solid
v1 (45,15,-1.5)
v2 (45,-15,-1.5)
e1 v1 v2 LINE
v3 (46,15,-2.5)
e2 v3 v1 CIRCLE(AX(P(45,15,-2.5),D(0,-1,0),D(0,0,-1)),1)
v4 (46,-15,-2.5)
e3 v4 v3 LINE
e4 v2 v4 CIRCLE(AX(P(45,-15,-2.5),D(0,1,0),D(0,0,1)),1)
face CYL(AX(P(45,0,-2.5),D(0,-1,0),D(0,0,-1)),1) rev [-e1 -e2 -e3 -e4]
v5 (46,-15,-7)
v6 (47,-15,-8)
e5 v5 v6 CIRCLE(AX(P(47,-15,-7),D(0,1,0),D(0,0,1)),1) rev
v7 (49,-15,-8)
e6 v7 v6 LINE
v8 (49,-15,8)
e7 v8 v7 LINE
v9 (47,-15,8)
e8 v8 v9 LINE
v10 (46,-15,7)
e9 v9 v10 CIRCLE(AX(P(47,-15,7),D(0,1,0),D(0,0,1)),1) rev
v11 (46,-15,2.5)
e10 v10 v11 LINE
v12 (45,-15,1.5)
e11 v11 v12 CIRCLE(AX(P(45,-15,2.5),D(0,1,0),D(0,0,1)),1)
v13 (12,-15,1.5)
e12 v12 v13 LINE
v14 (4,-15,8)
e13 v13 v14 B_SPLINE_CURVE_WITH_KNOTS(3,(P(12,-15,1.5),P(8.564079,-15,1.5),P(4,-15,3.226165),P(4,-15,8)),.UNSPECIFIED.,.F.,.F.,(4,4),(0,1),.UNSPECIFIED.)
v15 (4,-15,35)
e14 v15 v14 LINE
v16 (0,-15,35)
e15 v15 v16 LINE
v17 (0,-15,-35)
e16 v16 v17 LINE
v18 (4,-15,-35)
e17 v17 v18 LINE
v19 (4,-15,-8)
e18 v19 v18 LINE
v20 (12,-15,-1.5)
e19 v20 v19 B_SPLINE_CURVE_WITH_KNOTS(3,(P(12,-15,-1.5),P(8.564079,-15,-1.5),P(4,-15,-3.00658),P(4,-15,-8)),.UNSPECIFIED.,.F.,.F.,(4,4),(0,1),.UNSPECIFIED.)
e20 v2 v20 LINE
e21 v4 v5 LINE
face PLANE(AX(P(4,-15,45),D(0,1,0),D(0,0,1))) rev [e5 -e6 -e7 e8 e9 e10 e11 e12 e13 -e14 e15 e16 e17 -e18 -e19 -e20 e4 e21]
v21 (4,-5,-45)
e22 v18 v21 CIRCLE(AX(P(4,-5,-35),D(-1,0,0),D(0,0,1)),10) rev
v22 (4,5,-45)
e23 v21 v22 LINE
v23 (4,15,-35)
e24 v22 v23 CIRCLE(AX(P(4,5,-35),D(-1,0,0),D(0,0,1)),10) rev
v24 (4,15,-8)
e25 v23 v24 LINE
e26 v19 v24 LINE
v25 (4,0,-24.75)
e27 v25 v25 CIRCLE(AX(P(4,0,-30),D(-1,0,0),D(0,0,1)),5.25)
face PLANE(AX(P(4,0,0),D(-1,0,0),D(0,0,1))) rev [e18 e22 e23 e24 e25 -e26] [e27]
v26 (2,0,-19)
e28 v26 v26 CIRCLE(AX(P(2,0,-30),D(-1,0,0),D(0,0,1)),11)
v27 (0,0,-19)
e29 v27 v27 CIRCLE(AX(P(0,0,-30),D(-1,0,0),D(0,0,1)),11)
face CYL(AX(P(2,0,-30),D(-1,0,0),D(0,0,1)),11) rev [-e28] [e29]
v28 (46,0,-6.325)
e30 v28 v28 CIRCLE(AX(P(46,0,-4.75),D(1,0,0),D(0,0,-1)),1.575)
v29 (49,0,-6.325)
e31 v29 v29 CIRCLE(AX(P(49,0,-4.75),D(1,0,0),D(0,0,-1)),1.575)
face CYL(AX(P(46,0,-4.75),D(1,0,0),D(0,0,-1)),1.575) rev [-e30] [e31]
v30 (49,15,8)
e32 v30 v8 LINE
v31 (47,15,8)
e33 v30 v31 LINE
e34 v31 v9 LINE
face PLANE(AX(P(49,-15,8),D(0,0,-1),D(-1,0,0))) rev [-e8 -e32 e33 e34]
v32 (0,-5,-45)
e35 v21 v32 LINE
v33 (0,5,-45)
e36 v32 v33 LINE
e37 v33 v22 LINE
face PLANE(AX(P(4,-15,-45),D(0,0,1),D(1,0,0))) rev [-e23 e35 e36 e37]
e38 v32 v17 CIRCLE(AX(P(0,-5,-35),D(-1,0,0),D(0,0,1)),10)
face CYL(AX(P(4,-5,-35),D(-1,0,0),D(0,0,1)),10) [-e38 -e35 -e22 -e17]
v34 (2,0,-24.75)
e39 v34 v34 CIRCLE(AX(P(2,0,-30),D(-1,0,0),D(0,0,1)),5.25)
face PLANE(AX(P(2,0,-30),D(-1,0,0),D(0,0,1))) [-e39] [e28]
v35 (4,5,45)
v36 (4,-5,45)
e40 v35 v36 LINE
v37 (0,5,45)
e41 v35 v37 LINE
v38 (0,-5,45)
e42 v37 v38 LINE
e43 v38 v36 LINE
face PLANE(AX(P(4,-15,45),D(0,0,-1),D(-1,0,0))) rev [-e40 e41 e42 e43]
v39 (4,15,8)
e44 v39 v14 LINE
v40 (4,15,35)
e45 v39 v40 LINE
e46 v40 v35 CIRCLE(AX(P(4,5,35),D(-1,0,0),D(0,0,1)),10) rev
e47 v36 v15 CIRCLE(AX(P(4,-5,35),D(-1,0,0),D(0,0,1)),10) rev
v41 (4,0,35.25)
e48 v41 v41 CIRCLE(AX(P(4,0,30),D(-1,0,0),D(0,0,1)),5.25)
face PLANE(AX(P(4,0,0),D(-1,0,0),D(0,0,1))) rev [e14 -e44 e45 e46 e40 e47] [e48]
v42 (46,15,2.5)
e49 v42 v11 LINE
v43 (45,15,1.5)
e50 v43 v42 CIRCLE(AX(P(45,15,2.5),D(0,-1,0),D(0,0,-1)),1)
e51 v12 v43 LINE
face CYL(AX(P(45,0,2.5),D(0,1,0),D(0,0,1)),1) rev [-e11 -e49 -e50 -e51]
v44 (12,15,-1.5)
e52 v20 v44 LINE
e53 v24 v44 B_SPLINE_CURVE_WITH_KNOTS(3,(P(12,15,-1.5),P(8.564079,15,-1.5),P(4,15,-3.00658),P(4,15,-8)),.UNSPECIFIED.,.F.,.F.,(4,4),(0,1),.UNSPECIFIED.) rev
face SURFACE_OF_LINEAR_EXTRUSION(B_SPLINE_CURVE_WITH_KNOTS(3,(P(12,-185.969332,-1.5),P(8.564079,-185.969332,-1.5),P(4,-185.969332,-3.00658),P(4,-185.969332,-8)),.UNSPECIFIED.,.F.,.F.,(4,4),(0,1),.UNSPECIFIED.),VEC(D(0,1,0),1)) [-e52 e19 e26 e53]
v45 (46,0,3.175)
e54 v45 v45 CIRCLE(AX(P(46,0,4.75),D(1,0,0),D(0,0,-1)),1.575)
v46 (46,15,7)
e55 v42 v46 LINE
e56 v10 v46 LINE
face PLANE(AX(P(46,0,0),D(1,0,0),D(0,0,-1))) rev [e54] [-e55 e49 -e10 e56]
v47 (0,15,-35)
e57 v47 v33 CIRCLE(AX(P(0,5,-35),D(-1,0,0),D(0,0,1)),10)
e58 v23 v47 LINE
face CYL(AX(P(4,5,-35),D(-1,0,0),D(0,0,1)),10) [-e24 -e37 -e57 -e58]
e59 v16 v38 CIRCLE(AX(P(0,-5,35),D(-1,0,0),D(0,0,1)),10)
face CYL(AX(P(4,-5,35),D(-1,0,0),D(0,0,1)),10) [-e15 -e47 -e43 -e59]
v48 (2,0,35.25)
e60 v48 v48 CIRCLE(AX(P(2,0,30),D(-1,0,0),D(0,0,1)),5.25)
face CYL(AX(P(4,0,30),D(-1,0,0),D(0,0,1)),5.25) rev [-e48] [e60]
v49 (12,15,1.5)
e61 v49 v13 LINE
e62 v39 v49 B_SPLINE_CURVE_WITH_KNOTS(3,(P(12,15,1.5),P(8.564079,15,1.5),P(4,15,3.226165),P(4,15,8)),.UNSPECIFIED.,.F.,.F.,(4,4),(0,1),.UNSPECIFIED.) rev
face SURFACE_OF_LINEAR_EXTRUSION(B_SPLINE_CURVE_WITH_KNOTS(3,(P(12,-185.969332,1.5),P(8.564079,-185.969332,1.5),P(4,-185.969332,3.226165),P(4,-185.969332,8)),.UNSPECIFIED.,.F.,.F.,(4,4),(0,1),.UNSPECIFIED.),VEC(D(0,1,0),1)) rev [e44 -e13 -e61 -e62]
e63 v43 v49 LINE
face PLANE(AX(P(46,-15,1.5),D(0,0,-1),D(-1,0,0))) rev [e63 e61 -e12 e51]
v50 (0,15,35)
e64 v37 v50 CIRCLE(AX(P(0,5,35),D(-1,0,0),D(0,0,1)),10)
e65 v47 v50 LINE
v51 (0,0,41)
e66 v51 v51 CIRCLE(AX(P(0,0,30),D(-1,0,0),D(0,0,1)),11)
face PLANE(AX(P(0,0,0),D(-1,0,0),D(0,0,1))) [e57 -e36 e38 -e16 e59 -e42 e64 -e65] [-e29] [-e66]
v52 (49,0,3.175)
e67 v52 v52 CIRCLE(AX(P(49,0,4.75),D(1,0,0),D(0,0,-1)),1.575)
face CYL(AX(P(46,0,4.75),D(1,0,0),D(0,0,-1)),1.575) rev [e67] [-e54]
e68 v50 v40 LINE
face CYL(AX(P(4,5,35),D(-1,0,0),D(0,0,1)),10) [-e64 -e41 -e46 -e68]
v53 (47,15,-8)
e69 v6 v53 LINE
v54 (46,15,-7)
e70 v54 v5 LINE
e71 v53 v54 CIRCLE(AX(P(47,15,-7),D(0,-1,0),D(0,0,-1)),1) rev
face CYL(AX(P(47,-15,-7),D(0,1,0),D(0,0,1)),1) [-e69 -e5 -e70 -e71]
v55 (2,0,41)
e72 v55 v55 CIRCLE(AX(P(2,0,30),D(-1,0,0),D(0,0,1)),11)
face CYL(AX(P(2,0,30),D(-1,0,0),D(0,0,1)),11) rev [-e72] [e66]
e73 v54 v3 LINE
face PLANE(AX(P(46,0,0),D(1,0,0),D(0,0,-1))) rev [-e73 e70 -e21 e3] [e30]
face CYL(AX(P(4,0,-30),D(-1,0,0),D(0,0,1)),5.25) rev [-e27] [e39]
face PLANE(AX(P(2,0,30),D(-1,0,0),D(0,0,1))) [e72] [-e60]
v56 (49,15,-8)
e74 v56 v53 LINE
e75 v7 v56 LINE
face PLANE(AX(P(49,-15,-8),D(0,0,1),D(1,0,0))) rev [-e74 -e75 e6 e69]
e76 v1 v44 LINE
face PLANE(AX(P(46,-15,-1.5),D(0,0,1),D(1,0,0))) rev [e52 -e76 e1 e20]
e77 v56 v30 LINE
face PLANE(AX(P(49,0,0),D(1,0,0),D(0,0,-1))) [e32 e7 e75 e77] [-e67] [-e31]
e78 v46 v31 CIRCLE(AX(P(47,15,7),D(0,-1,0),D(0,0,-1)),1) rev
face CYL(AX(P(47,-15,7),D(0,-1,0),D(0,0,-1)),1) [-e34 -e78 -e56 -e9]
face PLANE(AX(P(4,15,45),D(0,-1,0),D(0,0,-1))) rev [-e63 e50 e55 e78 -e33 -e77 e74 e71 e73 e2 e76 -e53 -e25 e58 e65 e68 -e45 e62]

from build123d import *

# Parameters (mm, degrees)
SKETCH1_W                = 90
SKETCH1_H                = 30
BOSS_EXTRUDE1_DEPTH      = 4
FILLET1_R                = 10
SKETCH2_R                = 1.25
CUT_EXTRUDE1_DEPTH       = 48.602520942
SKETCH3_R                = 1.25
CUT_EXTRUDE2_DEPTH       = 48.602520942
SKETCH4_W                = 16
SKETCH4_H                = 30
BOSS_EXTRUDE5_DEPTH      = 3
SKETCH11_W               = 3
SKETCH11_H               = 30
BOSS_EXTRUDE6_DEPTH      = 39
SKETCH12_W               = 16
SKETCH12_H               = 30
BOSS_EXTRUDE7_DEPTH      = 3
SKETCH14_R               = 1.575
CUT_EXTRUDE7_DEPTH       = 3
SKETCH13_R               = 1.575
CUT_EXTRUDE8_DEPTH       = 3
FILLET2_R                = 5
CUT_EXTRUDE10_START      = -30
CUT_EXTRUDE10_DEPTH      = 30
CUT_EXTRUDE11_DEPTH      = 73.97944927
CUT_EXTRUDE11_DEPTH_BACK = 73.97944927
FILLET3_R                = 1
SKETCH18_R               = 11
CUT_EXTRUDE12_DEPTH      = 2
SKETCH19_R               = 11
CUT_EXTRUDE13_DEPTH      = 2
SKETCH20_R               = 5.25
CUT_EXTRUDE14_DEPTH      = 2
SKETCH21_R               = 5.25
CUT_EXTRUDE15_DEPTH      = 2


# Read off the part's stored shape, not the designer's step: Cut-Extrude10
with BuildPart() as part:
    # Sketch1 → Boss-Extrude1 (new body)
    with BuildSketch(Plane(origin=(0, 0, 0), x_dir=(0, 0, -1), z_dir=(1, 0, 0))):
        Rectangle(SKETCH1_W, SKETCH1_H)
    extrude(amount=BOSS_EXTRUDE1_DEPTH)

    # Fillet1
    fillet1_edges = [part.edges().sort_by_distance(p)[0] for p in [
        (2, -15, -45),
        (2, -15, 45),
        (2, 15, 45),
        (2, 15, -45),
    ]]
    fillet(fillet1_edges, radius=FILLET1_R)

    # Sketch2 → Cut-Extrude1 (cut, through all)
    with BuildSketch(Plane(origin=(4, 0, 0), x_dir=(0, 0, -1), z_dir=(1, 0, 0))):
        with Locations((-30, 0)):
            Circle(SKETCH2_R)
    extrude(amount=-CUT_EXTRUDE1_DEPTH, mode=Mode.SUBTRACT)

    # Sketch3 → Cut-Extrude2 (cut, through all)
    with BuildSketch(Plane(origin=(4, 0, 0), x_dir=(0, 0, -1), z_dir=(1, 0, 0))):
        with Locations((30, 0)):
            Circle(SKETCH3_R)
    extrude(amount=-CUT_EXTRUDE2_DEPTH, mode=Mode.SUBTRACT)

    # Sketch4 → Boss-Extrude5 (add)
    with BuildSketch(Plane(origin=(4, 0, 0), x_dir=(0, 0, -1), z_dir=(1, 0, 0))):
        Rectangle(SKETCH4_W, SKETCH4_H)
    extrude(amount=BOSS_EXTRUDE5_DEPTH)

    # Sketch11 → Boss-Extrude6 (add)
    with BuildSketch(Plane(origin=(7, 0, 0), x_dir=(0, 0, -1), z_dir=(1, 0, 0))):
        Rectangle(SKETCH11_W, SKETCH11_H)
    extrude(amount=BOSS_EXTRUDE6_DEPTH)

    # Sketch12 → Boss-Extrude7 (add)
    with BuildSketch(Plane(origin=(46, 0, 0), x_dir=(0, 0, -1), z_dir=(1, 0, 0))):
        Rectangle(SKETCH12_W, SKETCH12_H)
    extrude(amount=BOSS_EXTRUDE7_DEPTH)

    # Sketch14 → Cut-Extrude7 (cut)
    with BuildSketch(Plane(origin=(49, 0, 0), x_dir=(0, 0, -1), z_dir=(1, 0, 0))):
        with Locations((4.75, 0)):
            Circle(SKETCH14_R)
    extrude(amount=-CUT_EXTRUDE7_DEPTH, mode=Mode.SUBTRACT)

    # Sketch13 → Cut-Extrude8 (cut)
    with BuildSketch(Plane(origin=(49, 0, 0), x_dir=(0, 0, -1), z_dir=(1, 0, 0))):
        with Locations((-4.75, 0)):
            Circle(SKETCH13_R)
    extrude(amount=-CUT_EXTRUDE8_DEPTH, mode=Mode.SUBTRACT)

    # Fillet2
    fillet2_edges = [part.edges().sort_by_distance(p)[0] for p in [
        (7, 0, -1.5),
        (7, 0, 1.5),
    ]]
    fillet(fillet2_edges, radius=FILLET2_R)

    # Cut-Extrude10 outline → Cut-Extrude10 (cut)
    with BuildSketch(Plane.XZ.offset(15).offset(CUT_EXTRUDE10_START)):
        with BuildLine():
            add(Edge.make_bspline(
                [(12, 1.5), (8.564078645, 1.5), (4, 3.226164853), (4, 8)],
                knots=[0, 0, 0, 0, 1, 1, 1, 1], degree=3))
            ThreePointArc((12, 1.5), (8.464466094, 2.964466094), (7, 6.5))
            Line((7, 6.5), (7, 8))
            Line((7, 8), (4, 8))
        make_face()
    extrude(amount=CUT_EXTRUDE10_DEPTH, mode=Mode.SUBTRACT)

    # Sketch16 → Cut-Extrude11 (cut, two sides: drawn at the far end of the back side and taken through both)
    with BuildSketch(Plane.XZ.offset(15).offset(-CUT_EXTRUDE11_DEPTH_BACK)):
        with BuildLine():
            ThreePointArc((7, -6.5), (8.464466094, -2.964466094), (12, -1.5))
            add(Edge.make_bspline(
                [(12, -1.5), (8.564078645, -1.5), (4, -3.006580432), (4, -8)],
                knots=[0, 0, 0, 0, 1, 1, 1, 1], degree=3))
            Line((4, -8), (7, -8))
            Line((7, -8), (7, -6.5))
        make_face()
    extrude(amount=CUT_EXTRUDE11_DEPTH + CUT_EXTRUDE11_DEPTH_BACK, mode=Mode.SUBTRACT)

    # Fillet3
    fillet3_edges = [part.edges().sort_by_distance(p)[0] for p in [
        (46, 0, -1.5),
        (46, 0, 1.5),
        (46, 0, 8),
        (46, 0, -8),
    ]]
    fillet(fillet3_edges, radius=FILLET3_R)

    # Sketch18 → Cut-Extrude12 (cut)
    with BuildSketch(Plane.ZY):
        with Locations((30, 0)):
            Circle(SKETCH18_R)
    extrude(amount=-CUT_EXTRUDE12_DEPTH, mode=Mode.SUBTRACT)

    # Sketch19 → Cut-Extrude13 (cut)
    with BuildSketch(Plane.ZY):
        with Locations((-30, 0)):
            Circle(SKETCH19_R)
    extrude(amount=-CUT_EXTRUDE13_DEPTH, mode=Mode.SUBTRACT)

    # Sketch20 → Cut-Extrude14 (cut)
    with BuildSketch(Plane.ZY.offset(-2)):
        with Locations((30, 0)):
            Circle(SKETCH20_R)
    extrude(amount=-CUT_EXTRUDE14_DEPTH, mode=Mode.SUBTRACT)

    # Sketch21 → Cut-Extrude15 (cut)
    with BuildSketch(Plane.ZY.offset(-2)):
        with Locations((-30, 0)):
            Circle(SKETCH21_R)
    extrude(amount=-CUT_EXTRUDE15_DEPTH, mode=Mode.SUBTRACT)


solid = part.part
